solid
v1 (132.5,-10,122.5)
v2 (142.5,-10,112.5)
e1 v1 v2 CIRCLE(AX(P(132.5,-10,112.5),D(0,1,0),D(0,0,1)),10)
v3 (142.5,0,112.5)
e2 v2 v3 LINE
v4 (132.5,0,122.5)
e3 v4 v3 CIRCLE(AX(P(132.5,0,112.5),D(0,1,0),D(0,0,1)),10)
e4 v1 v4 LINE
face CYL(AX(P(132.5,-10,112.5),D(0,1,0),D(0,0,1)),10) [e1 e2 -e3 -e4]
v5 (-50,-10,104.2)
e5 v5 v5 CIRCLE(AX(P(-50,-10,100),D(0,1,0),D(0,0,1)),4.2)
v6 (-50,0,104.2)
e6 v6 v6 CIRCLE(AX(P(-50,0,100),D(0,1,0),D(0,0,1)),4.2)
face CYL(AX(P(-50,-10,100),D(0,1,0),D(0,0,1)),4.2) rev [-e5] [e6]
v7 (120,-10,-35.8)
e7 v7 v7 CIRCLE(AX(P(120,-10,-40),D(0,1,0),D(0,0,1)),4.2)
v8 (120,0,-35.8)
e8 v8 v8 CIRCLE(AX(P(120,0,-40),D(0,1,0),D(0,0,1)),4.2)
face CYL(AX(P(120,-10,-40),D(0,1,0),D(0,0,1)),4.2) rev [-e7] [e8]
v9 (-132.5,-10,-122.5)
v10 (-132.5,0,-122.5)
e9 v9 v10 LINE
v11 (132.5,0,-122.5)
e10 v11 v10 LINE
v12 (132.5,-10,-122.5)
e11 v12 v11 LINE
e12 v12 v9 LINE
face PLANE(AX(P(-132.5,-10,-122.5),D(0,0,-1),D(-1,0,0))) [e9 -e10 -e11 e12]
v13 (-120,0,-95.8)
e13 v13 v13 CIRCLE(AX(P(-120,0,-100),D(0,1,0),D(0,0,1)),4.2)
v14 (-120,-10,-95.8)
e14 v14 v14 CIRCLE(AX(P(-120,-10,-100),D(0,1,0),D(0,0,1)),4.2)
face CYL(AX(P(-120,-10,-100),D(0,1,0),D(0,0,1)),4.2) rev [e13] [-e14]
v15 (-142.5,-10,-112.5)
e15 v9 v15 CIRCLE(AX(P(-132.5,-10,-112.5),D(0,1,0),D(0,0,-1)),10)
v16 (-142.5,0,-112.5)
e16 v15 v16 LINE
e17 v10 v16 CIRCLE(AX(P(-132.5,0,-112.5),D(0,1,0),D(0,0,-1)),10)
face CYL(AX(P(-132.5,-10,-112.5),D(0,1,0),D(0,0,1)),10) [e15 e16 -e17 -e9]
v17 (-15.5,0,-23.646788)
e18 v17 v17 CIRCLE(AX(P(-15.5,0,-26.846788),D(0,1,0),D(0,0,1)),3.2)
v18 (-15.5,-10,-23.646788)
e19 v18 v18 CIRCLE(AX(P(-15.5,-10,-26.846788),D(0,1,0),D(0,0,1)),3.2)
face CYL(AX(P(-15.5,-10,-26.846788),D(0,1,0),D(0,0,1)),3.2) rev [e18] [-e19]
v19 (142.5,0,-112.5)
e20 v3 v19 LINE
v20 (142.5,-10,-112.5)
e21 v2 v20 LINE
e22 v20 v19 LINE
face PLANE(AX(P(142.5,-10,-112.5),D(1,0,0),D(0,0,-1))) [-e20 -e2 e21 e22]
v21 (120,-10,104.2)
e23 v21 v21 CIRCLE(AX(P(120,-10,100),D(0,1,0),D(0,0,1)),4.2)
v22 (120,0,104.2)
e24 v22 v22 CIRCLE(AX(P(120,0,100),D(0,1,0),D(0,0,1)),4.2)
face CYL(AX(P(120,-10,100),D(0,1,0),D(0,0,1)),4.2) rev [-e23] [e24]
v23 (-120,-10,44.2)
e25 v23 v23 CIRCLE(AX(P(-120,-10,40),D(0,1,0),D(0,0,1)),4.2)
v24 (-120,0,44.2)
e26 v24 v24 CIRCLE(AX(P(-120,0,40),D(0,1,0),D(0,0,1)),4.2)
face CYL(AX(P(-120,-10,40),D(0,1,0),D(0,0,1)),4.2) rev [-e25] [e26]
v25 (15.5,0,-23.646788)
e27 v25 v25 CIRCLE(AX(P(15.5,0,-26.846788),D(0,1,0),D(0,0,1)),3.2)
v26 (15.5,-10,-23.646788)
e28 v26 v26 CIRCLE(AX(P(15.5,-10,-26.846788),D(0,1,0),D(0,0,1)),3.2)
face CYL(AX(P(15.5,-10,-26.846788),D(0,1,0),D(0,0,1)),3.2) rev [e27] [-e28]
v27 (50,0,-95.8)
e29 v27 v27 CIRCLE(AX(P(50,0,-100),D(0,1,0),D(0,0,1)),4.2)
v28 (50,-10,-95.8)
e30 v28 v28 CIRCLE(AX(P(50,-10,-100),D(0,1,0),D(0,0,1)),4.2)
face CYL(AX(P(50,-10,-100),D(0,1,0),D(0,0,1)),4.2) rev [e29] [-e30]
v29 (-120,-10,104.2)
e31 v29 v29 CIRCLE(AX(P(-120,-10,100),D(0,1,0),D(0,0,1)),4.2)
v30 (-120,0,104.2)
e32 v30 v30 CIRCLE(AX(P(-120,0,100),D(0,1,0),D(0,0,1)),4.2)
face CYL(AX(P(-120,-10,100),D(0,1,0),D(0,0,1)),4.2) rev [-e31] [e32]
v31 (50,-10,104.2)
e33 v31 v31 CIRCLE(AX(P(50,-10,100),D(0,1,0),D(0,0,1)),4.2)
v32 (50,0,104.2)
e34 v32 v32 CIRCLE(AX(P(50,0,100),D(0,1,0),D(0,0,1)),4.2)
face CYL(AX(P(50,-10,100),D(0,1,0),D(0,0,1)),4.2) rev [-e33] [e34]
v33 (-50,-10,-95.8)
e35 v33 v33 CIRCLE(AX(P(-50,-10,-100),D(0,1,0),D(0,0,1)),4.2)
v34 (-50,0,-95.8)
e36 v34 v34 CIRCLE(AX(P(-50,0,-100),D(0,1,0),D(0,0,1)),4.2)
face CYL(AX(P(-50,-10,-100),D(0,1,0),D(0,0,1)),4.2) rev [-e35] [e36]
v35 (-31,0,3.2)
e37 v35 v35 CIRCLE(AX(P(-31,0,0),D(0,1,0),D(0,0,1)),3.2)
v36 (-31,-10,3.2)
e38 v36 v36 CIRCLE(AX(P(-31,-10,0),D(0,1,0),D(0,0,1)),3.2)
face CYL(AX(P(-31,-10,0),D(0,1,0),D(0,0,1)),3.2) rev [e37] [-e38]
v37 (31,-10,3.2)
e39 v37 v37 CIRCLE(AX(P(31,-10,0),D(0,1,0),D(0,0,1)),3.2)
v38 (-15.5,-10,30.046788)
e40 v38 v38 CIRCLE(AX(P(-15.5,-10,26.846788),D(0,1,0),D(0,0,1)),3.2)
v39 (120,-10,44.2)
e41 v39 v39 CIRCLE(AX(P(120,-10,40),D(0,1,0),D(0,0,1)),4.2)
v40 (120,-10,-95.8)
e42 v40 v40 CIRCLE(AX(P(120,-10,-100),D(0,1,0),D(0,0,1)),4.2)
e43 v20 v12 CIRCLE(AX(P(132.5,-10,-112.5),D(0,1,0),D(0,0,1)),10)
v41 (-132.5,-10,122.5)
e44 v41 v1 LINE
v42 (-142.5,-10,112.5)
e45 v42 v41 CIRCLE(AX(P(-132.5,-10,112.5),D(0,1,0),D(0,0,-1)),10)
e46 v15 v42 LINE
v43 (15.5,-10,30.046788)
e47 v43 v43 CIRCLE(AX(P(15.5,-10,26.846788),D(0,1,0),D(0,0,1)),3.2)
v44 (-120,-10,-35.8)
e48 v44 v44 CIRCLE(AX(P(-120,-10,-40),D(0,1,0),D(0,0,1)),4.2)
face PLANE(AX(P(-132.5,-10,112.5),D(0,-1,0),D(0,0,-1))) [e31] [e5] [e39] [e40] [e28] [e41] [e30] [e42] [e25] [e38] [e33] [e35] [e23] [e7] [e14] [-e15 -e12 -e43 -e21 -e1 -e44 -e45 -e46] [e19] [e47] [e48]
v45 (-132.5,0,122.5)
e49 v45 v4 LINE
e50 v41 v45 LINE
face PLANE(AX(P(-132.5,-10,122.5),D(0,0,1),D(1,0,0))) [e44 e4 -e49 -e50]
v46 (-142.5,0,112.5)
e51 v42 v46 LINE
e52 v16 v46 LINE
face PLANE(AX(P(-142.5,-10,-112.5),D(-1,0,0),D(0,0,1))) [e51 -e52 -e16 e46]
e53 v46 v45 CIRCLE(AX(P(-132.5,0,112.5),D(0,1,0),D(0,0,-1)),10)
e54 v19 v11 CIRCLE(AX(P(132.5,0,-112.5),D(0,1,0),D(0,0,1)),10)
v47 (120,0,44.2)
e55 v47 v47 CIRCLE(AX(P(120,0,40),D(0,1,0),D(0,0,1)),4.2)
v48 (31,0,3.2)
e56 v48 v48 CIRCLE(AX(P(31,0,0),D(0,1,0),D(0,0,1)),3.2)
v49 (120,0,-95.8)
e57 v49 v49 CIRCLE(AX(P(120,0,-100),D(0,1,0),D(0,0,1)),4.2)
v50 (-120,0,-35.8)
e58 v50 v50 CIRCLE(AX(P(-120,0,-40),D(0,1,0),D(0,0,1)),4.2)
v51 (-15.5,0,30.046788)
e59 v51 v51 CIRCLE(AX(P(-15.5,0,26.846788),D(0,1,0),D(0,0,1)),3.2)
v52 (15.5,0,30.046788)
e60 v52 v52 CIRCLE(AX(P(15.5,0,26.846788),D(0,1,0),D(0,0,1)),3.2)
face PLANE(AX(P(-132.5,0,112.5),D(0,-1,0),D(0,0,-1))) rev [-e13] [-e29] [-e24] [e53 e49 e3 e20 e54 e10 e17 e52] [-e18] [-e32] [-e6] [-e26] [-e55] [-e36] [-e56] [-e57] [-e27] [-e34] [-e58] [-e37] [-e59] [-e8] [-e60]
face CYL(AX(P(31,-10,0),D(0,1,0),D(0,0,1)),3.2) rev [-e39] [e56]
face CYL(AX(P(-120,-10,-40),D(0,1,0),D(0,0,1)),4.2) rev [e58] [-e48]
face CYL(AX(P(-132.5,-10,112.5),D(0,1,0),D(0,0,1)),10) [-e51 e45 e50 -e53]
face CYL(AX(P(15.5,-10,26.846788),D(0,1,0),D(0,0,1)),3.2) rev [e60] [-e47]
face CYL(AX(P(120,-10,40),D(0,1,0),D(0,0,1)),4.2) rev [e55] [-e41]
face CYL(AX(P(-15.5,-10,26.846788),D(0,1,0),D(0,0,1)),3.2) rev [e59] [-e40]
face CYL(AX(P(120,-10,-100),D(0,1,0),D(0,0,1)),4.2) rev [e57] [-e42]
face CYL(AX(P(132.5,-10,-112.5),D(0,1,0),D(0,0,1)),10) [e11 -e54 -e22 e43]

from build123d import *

# Parameters (mm, degrees)
SKETCH1_R          = 4.2
SKETCH1_R_2        = 3.2
BASE_FLANGE1_DEPTH = 10


# Sheet-metal steps are written as plain solids
with BuildPart() as part:
    # Sketch1 → Base-Flange1 (new body)
    with BuildSketch(Plane(origin=(0, 0, 0), x_dir=(1, 0, 0), z_dir=(0, 1, 0))):
        with BuildLine():
            Line((-132.5, 122.5), (132.5, 122.5))
            ThreePointArc((132.5, 122.5), (139.571067812, 119.571067812), (142.5, 112.5))
            Line((142.5, 112.5), (142.5, -112.5))
            ThreePointArc((142.5, -112.5), (139.571067812, -119.571067812), (132.5, -122.5))
            Line((132.5, -122.5), (-132.5, -122.5))
            ThreePointArc((-132.5, -122.5), (-139.571067812, -119.571067812), (-142.5, -112.5))
            Line((-142.5, -112.5), (-142.5, 112.5))
            ThreePointArc((-142.5, 112.5), (-139.571067812, 119.571067812), (-132.5, 122.5))
        make_face()
        with Locations(Location((120, 40, 0), (0, 0, 270))):
            Circle(SKETCH1_R, mode=Mode.SUBTRACT)
        with Locations(Location((120, -40, 0), (0, 0, 270))):
            Circle(SKETCH1_R, mode=Mode.SUBTRACT)
        with Locations(Location((-120, 40, 0), (0, 0, 270))):
            Circle(SKETCH1_R, mode=Mode.SUBTRACT)
        with Locations(Location((-120, -40, 0), (0, 0, 270))):
            Circle(SKETCH1_R, mode=Mode.SUBTRACT)
        with Locations(Location((-120, 100, 0), (0, 0, 270))):
            Circle(SKETCH1_R, mode=Mode.SUBTRACT)
        with Locations(Location((-50, 100, 0), (0, 0, 270))):
            Circle(SKETCH1_R, mode=Mode.SUBTRACT)
        with Locations(Location((50, 100, 0), (0, 0, 270))):
            Circle(SKETCH1_R, mode=Mode.SUBTRACT)
        with Locations(Location((120, 100, 0), (0, 0, 270))):
            Circle(SKETCH1_R, mode=Mode.SUBTRACT)
        with Locations(Location((120, -100, 0), (0, 0, 270))):
            Circle(SKETCH1_R, mode=Mode.SUBTRACT)
        with Locations(Location((50, -100, 0), (0, 0, 270))):
            Circle(SKETCH1_R, mode=Mode.SUBTRACT)
        with Locations(Location((-50, -100, 0), (0, 0, 270))):
            Circle(SKETCH1_R, mode=Mode.SUBTRACT)
        with Locations(Location((-120, -100, 0), (0, 0, 270))):
            Circle(SKETCH1_R, mode=Mode.SUBTRACT)
        with Locations(Location((31, 0, 0), (0, 0, 270))):
            Circle(SKETCH1_R_2, mode=Mode.SUBTRACT)
        with Locations(Location((15.5, -26.846787517, 0), (0, 0, 270))):
            Circle(SKETCH1_R_2, mode=Mode.SUBTRACT)
        with Locations(Location((-15.5, -26.846787517, 0), (0, 0, 270))):
            Circle(SKETCH1_R_2, mode=Mode.SUBTRACT)
        with Locations(Location((-31, 0, 0), (0, 0, 270))):
            Circle(SKETCH1_R_2, mode=Mode.SUBTRACT)
        with Locations(Location((-15.5, 26.846787517, 0), (0, 0, 270))):
            Circle(SKETCH1_R_2, mode=Mode.SUBTRACT)
        with Locations(Location((15.5, 26.846787517, 0), (0, 0, 270))):
            Circle(SKETCH1_R_2, mode=Mode.SUBTRACT)
    extrude(amount=-BASE_FLANGE1_DEPTH)


solid = part.part
